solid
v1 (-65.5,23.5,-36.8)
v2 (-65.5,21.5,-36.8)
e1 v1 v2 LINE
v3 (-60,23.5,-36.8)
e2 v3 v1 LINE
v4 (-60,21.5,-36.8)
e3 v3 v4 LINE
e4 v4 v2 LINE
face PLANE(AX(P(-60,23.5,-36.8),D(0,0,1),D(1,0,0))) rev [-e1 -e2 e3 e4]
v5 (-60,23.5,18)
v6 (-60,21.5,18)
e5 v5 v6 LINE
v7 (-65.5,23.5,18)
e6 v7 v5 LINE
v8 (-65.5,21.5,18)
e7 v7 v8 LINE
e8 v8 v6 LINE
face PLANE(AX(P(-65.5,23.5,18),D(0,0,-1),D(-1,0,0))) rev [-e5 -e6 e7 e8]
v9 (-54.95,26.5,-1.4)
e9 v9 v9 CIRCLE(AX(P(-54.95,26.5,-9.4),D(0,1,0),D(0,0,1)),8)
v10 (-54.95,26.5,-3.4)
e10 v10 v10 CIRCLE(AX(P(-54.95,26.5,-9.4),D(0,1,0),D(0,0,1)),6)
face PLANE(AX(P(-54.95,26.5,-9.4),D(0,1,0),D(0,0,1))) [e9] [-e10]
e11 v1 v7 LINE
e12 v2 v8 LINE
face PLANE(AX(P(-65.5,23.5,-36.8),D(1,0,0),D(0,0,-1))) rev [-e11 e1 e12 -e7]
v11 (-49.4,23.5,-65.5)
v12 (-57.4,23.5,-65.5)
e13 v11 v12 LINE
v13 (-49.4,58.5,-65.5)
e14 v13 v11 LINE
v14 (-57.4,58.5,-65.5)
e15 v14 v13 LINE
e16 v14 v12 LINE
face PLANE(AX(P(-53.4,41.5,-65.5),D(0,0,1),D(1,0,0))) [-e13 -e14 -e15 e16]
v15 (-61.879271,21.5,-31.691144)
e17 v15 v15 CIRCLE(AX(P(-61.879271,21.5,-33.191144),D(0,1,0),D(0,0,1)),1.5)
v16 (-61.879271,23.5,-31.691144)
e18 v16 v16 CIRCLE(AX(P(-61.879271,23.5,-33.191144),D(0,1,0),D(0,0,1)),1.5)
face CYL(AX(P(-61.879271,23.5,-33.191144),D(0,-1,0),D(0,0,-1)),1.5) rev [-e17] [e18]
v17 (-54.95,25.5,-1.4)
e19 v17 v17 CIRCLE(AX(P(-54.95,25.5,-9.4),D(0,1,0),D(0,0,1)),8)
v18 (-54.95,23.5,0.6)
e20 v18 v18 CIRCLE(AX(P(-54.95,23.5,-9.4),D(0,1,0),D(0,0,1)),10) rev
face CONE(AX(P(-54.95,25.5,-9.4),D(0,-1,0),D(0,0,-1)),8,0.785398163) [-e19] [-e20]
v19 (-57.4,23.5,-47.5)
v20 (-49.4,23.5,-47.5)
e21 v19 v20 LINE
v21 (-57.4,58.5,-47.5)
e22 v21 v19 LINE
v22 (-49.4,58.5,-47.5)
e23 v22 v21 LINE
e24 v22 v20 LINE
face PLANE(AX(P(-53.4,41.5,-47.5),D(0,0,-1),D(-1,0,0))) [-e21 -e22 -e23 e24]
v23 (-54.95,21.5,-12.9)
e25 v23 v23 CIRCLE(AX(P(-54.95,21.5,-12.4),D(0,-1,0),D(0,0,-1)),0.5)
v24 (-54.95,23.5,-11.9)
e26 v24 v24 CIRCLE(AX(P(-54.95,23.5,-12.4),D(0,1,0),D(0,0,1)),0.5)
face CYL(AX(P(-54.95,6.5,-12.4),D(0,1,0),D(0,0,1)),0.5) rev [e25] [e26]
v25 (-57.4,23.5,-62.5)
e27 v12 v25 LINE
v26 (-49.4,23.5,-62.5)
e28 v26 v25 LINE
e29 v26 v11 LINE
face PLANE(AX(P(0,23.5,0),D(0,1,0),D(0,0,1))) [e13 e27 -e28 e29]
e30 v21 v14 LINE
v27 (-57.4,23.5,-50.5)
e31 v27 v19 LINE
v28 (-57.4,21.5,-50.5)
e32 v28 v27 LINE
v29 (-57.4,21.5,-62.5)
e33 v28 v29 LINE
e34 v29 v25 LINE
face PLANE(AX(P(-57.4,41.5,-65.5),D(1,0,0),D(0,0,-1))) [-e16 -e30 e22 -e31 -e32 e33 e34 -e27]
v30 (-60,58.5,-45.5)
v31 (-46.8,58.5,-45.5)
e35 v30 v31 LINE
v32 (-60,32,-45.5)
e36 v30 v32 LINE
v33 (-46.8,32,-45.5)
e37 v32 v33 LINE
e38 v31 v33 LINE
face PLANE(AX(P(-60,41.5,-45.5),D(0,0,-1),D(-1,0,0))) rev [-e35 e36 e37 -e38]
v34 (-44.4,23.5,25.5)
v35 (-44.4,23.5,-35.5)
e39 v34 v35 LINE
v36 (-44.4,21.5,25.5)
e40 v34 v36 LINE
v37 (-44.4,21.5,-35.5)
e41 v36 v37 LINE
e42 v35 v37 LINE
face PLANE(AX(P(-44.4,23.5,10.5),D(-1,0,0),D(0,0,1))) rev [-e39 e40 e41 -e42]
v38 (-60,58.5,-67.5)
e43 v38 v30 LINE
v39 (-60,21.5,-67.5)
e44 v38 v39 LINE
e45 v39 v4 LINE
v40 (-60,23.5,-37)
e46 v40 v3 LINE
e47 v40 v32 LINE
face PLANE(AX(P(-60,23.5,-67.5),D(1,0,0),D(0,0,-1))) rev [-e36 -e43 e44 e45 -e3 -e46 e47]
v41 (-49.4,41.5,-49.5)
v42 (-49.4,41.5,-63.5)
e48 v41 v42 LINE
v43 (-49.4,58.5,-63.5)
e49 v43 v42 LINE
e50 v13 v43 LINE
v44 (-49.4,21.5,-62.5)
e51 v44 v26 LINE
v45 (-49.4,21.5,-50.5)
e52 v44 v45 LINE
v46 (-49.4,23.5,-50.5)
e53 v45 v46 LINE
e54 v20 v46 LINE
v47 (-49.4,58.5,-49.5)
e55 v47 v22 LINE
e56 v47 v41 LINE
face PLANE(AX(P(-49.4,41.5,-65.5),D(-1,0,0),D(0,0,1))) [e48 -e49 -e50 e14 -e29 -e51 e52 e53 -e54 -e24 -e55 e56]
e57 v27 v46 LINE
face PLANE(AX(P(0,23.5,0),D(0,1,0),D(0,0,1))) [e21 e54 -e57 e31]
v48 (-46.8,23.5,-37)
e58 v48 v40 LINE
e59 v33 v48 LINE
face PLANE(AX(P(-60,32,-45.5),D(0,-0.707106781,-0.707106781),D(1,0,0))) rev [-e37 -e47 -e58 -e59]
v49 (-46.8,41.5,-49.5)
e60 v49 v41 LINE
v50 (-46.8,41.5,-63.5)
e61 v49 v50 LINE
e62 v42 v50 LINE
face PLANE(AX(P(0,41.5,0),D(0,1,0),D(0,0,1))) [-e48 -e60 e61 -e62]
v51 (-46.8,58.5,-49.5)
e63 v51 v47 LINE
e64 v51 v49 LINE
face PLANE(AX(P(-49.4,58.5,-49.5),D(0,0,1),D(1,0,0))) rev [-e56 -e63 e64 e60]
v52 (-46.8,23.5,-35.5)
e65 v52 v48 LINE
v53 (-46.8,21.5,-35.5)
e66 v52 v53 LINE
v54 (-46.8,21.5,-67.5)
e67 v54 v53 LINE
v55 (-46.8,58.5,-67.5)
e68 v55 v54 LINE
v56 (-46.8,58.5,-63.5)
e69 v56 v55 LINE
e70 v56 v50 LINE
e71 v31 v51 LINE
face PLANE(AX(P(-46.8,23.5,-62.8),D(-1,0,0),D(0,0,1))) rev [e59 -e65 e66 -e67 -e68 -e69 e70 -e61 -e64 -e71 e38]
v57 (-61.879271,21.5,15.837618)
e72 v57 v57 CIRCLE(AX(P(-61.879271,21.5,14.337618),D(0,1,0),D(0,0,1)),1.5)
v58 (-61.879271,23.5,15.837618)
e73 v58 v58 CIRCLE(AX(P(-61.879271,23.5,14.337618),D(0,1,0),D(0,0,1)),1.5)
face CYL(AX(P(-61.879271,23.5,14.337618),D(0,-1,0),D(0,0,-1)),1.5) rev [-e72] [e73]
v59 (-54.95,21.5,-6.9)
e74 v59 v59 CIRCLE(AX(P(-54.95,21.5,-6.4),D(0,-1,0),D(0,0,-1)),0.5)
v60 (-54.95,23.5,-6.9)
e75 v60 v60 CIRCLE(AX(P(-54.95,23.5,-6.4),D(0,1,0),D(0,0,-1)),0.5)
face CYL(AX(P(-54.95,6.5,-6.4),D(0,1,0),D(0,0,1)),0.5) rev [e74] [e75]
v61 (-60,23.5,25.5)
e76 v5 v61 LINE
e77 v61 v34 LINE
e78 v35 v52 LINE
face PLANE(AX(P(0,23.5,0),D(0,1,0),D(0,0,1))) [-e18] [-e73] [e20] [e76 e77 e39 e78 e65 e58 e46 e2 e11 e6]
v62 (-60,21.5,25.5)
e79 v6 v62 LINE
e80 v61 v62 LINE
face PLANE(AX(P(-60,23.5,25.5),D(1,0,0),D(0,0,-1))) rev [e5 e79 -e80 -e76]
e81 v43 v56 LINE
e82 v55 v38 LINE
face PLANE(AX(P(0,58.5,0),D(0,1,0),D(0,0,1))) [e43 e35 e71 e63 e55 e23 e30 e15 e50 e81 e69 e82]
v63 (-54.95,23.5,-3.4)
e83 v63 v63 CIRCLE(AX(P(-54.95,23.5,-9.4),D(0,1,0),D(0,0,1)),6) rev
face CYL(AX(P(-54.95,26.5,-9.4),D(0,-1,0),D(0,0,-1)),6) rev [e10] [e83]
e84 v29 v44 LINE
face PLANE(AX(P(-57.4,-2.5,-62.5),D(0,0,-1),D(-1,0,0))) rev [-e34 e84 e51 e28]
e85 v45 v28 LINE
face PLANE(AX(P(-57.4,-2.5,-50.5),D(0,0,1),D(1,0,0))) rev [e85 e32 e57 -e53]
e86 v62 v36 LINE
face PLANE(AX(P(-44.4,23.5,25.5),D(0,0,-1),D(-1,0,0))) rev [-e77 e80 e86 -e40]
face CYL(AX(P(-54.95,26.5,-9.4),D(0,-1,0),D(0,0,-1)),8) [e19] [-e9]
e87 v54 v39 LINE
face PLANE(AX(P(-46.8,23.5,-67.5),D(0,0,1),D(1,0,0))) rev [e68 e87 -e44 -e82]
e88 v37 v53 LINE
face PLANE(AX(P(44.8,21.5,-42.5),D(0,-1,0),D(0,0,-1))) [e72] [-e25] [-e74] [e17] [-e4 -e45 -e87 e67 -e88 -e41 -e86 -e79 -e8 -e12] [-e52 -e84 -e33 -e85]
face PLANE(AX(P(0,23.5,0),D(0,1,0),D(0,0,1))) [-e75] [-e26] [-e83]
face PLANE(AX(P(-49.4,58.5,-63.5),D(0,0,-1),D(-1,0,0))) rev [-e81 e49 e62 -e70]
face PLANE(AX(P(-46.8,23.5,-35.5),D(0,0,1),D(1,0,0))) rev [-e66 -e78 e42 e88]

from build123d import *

# Parameters (mm, degrees)
BOSS_EXTRUDE1_DEPTH  = 1.5
SKETCH2_W            = 4.8
SKETCH2_H            = 18
BOSS_EXTRUDE2_DEPTH  = 20
SKETCH3_R            = 1.5
CUT_EXTRUDE1_DEPTH   = 20
SKETCH4_R            = 3
SKETCH4_R_2          = 1.5
SKETCH4_W            = 4.828517764
SKETCH4_H            = 3.2
SKETCH4_W_2          = 5.829541735
SKETCH4_H_2          = 5.702554953
SKETCH4_W_3          = 4.58984945
BOSS_EXTRUDE3_DEPTH  = 3.8
SKETCH5_W            = 7.960049614
SKETCH5_H            = 4.589179968
SKETCH5_R            = 1.5
SKETCH5_W_2          = 8.506770289
SKETCH5_H_2          = 5.091999219
SKETCH5_W_3          = 7.172313144
SKETCH5_H_3          = 12.5
SKETCH5_H_4          = 13
BOSS_EXTRUDE4_DEPTH  = 4.25
SKETCH6_W            = 6.917388718
SKETCH6_H            = 7.693263261
SKETCH6_R            = 1.5
SKETCH6_W_2          = 6.017640473
SKETCH6_H_2          = 7.169329529
BOSS_EXTRUDE5_DEPTH  = 12.5
SKETCH7_R            = 1.5
BOSS_EXTRUDE7_DEPTH  = 2
INTERSECT1_DEPTH     = 21.5
SKETCH8_W            = 13.2
SKETCH8_H            = 22
BOSS_EXTRUDE8_DEPTH  = 18
SKETCH9_W            = 8
SKETCH9_H            = 12
CUT_EXTRUDE2_DEPTH   = 26
BOSS_EXTRUDE9_DEPTH  = 17
CHAMFER1_SIZE        = 8.5
SKETCH11_R           = 0.5
CUT_EXTRUDE3_DEPTH   = 17
SKETCH12_R           = 8
SKETCH12_R_2         = 6
BOSS_EXTRUDE10_DEPTH = 3
CHAMFER2_SIZE        = 2


# Read off the part's stored shape, not the designer's step: Intersect1
with BuildPart() as part:
    # Sketch1 → Boss-Extrude1 (new body)
    with BuildSketch(Plane(origin=(0, 0, 0), x_dir=(1, 0, 0), z_dir=(0, 1, 0))):
        Polygon((-60, -67.5), (-60, -72.5), (-52, -72.5), (-52, -67.5), (52, -67.5), (52, -72.5), (60, -72.5), (60, -67.5), (60, 67.5), (-60, 67.5), (-60, 36.8), (-65.5, 36.8), (-65.5, 29.3), (-60, 29.3), (-60, 16.8), (-65.5, 16.8), (-65.5, 7.8), (-65.5, -1.2), (-60, -1.2), (-60, -10.5), (-65.5, -10.5), (-65.5, -18), (-60, -18), align=None)
    extrude(amount=BOSS_EXTRUDE1_DEPTH)

    # Sketch2 → Boss-Extrude2 (add)
    with BuildSketch(Plane(origin=(0, 1.5, 0), x_dir=(1, 0, 0), z_dir=(0, 1, 0))):
        Polygon((-58, 62.8), (-58, 29.3), (-60, 29.3), (-65.5, 29.3), (-65.5, 36.8), (-60, 36.8), (-60, 67.5), (-55.3, 67.5), (-55.3, 65.5), align=None)
        with BuildLine():
            Line((-58, -65.5), (58, -65.5))
            Line((58, -65.5), (58, -25.5))
            Line((58, -25.5), (29.8, -25.5))
            Line((29.8, -25.5), (29.8, -18))
            Line((29.8, -18), (58, -18))
            Line((58, -18), (58, 38.5))
            ThreePointArc((58, 38.5), (57.414213562, 39.914213562), (56, 40.5))
            Line((56, 40.5), (51.8, 40.5))
            ThreePointArc((51.8, 40.5), (50.385786438, 41.085786438), (49.8, 42.5))
            Line((49.8, 42.5), (49.8, 48.75))
            Line((49.8, 48.75), (51.3, 48.75))
            Line((51.3, 48.75), (51.3, 47.25))
            Line((51.3, 47.25), (58, 47.25))
            Line((58, 47.25), (58, 51.25))
            Line((58, 51.25), (60, 51.25))
            Line((60, 51.25), (60, -72.5))
            Line((60, -72.5), (52, -72.5))
            Line((52, -72.5), (52, -67.5))
            Line((52, -67.5), (-52, -67.5))
            Line((-52, -67.5), (-52, -72.5))
            Line((-52, -72.5), (-60, -72.5))
            Line((-60, -72.5), (-60, -52.5))
            Line((-60, -52.5), (-58, -52.5))
            Line((-58, -52.5), (-58, -65.5))
        make_face()
        Polygon((-60, 16.8), (-58, 16.8), (-58, -1.2), (-60, -1.2), (-65.5, -1.2), (-65.5, 16.8), align=None)
        Polygon((-60, -10.5), (-58, -10.5), (-58, -38), (-60, -38), (-60, -18), (-65.5, -18), (-65.5, -10.5), align=None)
        with BuildLine():
            Line((-48.8, 67.5), (-48.8, 65.5))
            Line((-48.8, 65.5), (-46.8, 62.8))
            Line((-46.8, 62.8), (-46.8, 58.5))
            Line((-46.8, 58.5), (-44.8, 58.5))
            Line((-44.8, 58.5), (-37.8, 64.5))
            Line((-37.8, 64.5), (38.8, 64.5))
            Line((38.8, 64.5), (44.8, 58.5))
            Line((44.8, 58.5), (44.8, 46.5))
            Line((44.8, 46.5), (41.3, 46.5))
            Line((41.3, 46.5), (41.3, 42.5))
            Line((41.3, 42.5), (38.85, 42.5))
            Line((38.85, 42.5), (38.85, 40.5))
            Line((38.85, 40.5), (44.8, 40.5))
            ThreePointArc((44.8, 40.5), (46.214213562, 41.085786438), (46.8, 42.5))
            Line((46.8, 42.5), (46.8, 46.5))
            Line((46.8, 46.5), (46.8, 57.25))
            Line((46.8, 57.25), (51.3, 57.25))
            Line((51.3, 57.25), (51.3, 58.75))
            Line((51.3, 58.75), (58, 58.75))
            Line((58, 58.75), (58, 54.75))
            Line((58, 54.75), (60, 54.75))
            Line((60, 54.75), (60, 67.5))
            Line((60, 67.5), (-48.8, 67.5))
        make_face()
        Polygon((-46.8, 46.5), (-39.5, 46.5), (-39.5, 42.5), (-37.05, 42.5), (-37.05, 40.5), (-46.8, 40.5), align=None)
        Polygon((-33.55, 42.5), (-33.55, 40.5), (-18.65, 40.5), (-18.65, 42.5), (-21.1, 42.5), (-21.1, 46.5), (-31.1, 46.5), (-31.1, 42.5), align=None)
        Polygon((-15.55, 40.5), (-0.65, 40.5), (-0.65, 42.5), (-3.1, 42.5), (-3.1, 46.5), (-13.1, 46.5), (-13.1, 42.5), (-15.55, 42.5), align=None)
        Polygon((2.45, 40.5), (17.35, 40.5), (17.35, 42.5), (14.9, 42.5), (14.9, 46.5), (4.9, 46.5), (4.9, 42.5), (2.45, 42.5), align=None)
        Polygon((20.45, 40.5), (35.35, 40.5), (35.35, 42.5), (32.9, 42.5), (32.9, 46.5), (22.9, 46.5), (22.9, 42.5), (20.45, 42.5), align=None)
        Polygon((-46.8, 35.5), (-49.2, 35.5), (-49.2, 29.3), (-44.4, 29.3), (-44.4, 35.5), align=None)
        with Locations((-46.8, 7.8)):
            Rectangle(SKETCH2_W, SKETCH2_H)
        Polygon((-49.2, -10.5), (-44.4, -10.5), (-44.4, -18), (-16.9, -18), (-16.9, -25.5), (-46.4, -25.5), (-46.4, -19.9), (-49.2, -14), align=None)
    extrude(amount=BOSS_EXTRUDE2_DEPTH)

    # Sketch3 → Cut-Extrude1 (cut)
    with BuildSketch(Plane(origin=(0, 21.5, 0), x_dir=(1, 0, 0), z_dir=(0, 1, 0))):
        with Locations(Location((52.774715074, 63.354517547, 0), (0, 0, 270))):
            Circle(SKETCH3_R)
        with Locations(Location((-43.84271688, 64.854517547, 0), (0, 0, 270))):
            Circle(SKETCH3_R)
        with Locations(Location((-61.879270776, 33.191143968, 0), (0, 0, 270))):
            Circle(SKETCH3_R)
        with Locations(Location((-61.879270776, -14.337618299, 0), (0, 0, 270))):
            Circle(SKETCH3_R)
        with Locations(Location((54.274715074, 43.945098524, 0), (0, 0, 270))):
            Circle(SKETCH3_R)
        with Locations(Location((-21.029637868, -21.862387391, 0), (0, 0, 270))):
            Circle(SKETCH3_R)
        with Locations(Location((34.3, -21.75, 0), (0, 0, 270))):
            Circle(SKETCH3_R)
        with Locations(Location((-56, -69, 0), (0, 0, 270))):
            Circle(SKETCH3_R)
        with Locations(Location((56, -69, 0), (0, 0, 270))):
            Circle(SKETCH3_R)
    extrude(amount=-CUT_EXTRUDE1_DEPTH, mode=Mode.SUBTRACT)

    # Sketch4 → Boss-Extrude3 (add)
    # profile 1 of 5: a face of its own
    with BuildSketch(Plane(origin=(0, 1.5, 0), x_dir=(1, 0, 0), z_dir=(0, 1, 0))):
        with Locations(Location((21.544764921, -8.320497528, 0), (0, 0, 90))):
            Circle(SKETCH4_R)
        with Locations(Location((21.544764921, -8.320497528, 0), (0, 0, 90))):
            Circle(SKETCH4_R_2, mode=Mode.SUBTRACT)
    # profile 2 of 5: a face of its own
    with BuildSketch(Plane(origin=(0, 1.5, 0), x_dir=(1, 0, 0), z_dir=(0, 1, 0))):
        with Locations(Location((21.544764921, 19.479502472, 0), (0, 0, 90))):
            Circle(SKETCH4_R)
        with Locations(Location((21.544764921, 19.479502472, 0), (0, 0, 90))):
            Circle(SKETCH4_R_2, mode=Mode.SUBTRACT)
    # profile 3 of 5: a face of its own
    with BuildSketch(Plane(origin=(0, 1.5, 0), x_dir=(1, 0, 0), z_dir=(0, 1, 0))):
        with Locations((-29.2, 33.9)):
            Rectangle(SKETCH4_W, SKETCH4_H)
        with Locations(Location((-29.2, 33.9, 0), (0, 0, 90))):
            Circle(SKETCH4_R_2, mode=Mode.SUBTRACT)
    # profile 4 of 5: a face of its own
    with BuildSketch(Plane(origin=(0, 1.5, 0), x_dir=(1, 0, 0), z_dir=(0, 1, 0))):
        with Locations((-30.25253813, -15.148722524)):
            Rectangle(SKETCH4_W_2, SKETCH4_H_2)
        with Locations(Location((-30.3, -14.4, 0), (0, 0, 90))):
            Circle(SKETCH4_R_2, mode=Mode.SUBTRACT)
    # profile 5 of 5: a face of its own
    with BuildSketch(Plane(origin=(0, 1.5, 0), x_dir=(1, 0, 0), z_dir=(0, 1, 0))):
        with Locations((51.718864017, -15.148722524)):
            Rectangle(SKETCH4_W_3, SKETCH4_H_2)
        with Locations(Location((51.8, -14.4, 0), (0, 0, 90))):
            Circle(SKETCH4_R_2, mode=Mode.SUBTRACT)
    extrude(amount=BOSS_EXTRUDE3_DEPTH)

    # Sketch5 → Boss-Extrude4 (add)
    # profile 1 of 4: a face of its own
    with BuildSketch(Plane(origin=(0, 1.5, 0), x_dir=(1, 0, 0), z_dir=(0, 1, 0))):
        with Locations((-54.019975193, -35.705410016)):
            Rectangle(SKETCH5_W, SKETCH5_H)
        with Locations(Location((-52.773553759, -35.8, 0), (0, 0, 270))):
            Circle(SKETCH5_R, mode=Mode.SUBTRACT)
    # profile 2 of 4: a face of its own
    with BuildSketch(Plane(origin=(0, 1.5, 0), x_dir=(1, 0, 0), z_dir=(0, 1, 0))):
        with Locations((-53.746614856, -55.04599961)):
            Rectangle(SKETCH5_W_2, SKETCH5_H_2)
        with Locations(Location((-52.773553759, -54.7, 0), (0, 0, 270))):
            Circle(SKETCH5_R, mode=Mode.SUBTRACT)
    # profile 3 of 4: a face of its own
    with BuildSketch(Plane(origin=(0, 1.5, 0), x_dir=(1, 0, 0), z_dir=(0, 1, 0))):
        with Locations((-27.40354529, -31.75)):
            Rectangle(SKETCH5_W_3, SKETCH5_H_3)
        with Locations(Location((-27.173553759, -35.8, 0), (0, 0, 270))):
            Circle(SKETCH5_R, mode=Mode.SUBTRACT)
    # profile 4 of 4: a face of its own
    with BuildSketch(Plane(origin=(0, 1.5, 0), x_dir=(1, 0, 0), z_dir=(0, 1, 0))):
        with Locations((-27.40354529, -59)):
            Rectangle(SKETCH5_W_3, SKETCH5_H_4)
        with Locations(Location((-27.173553759, -54.7, 0), (0, 0, 270))):
            Circle(SKETCH5_R, mode=Mode.SUBTRACT)
    extrude(amount=BOSS_EXTRUDE4_DEPTH)

    # Sketch6 → Boss-Extrude5 (add)
    # profile 1 of 4: a face of its own
    with BuildSketch(Plane(origin=(0, 1.5, 0), x_dir=(1, 0, 0), z_dir=(0, 1, 0))):
        with Locations((-20.358694359, -29.346631631)):
            Rectangle(SKETCH6_W, SKETCH6_H)
        with Locations(Location((-19.26, -30.5, 0), (0, 0, 270))):
            Circle(SKETCH6_R, mode=Mode.SUBTRACT)
    # profile 2 of 4: a face of its own
    with BuildSketch(Plane(origin=(0, 1.5, 0), x_dir=(1, 0, 0), z_dir=(0, 1, 0))):
        with Locations((54.991179763, -29.346631631)):
            Rectangle(SKETCH6_W_2, SKETCH6_H)
        with Locations(Location((55.14, -30.5, 0), (0, 0, 270))):
            Circle(SKETCH6_R, mode=Mode.SUBTRACT)
    # profile 3 of 4: a face of its own
    with BuildSketch(Plane(origin=(0, 1.5, 0), x_dir=(1, 0, 0), z_dir=(0, 1, 0))):
        with Locations((54.991179763, -61.915335236)):
            Rectangle(SKETCH6_W_2, SKETCH6_H_2)
        with Locations(Location((55.14, -61.1, 0), (0, 0, 270))):
            Circle(SKETCH6_R, mode=Mode.SUBTRACT)
    # profile 4 of 4: a face of its own
    with BuildSketch(Plane(origin=(0, 1.5, 0), x_dir=(1, 0, 0), z_dir=(0, 1, 0))):
        with Locations((-20.358694359, -61.915335236)):
            Rectangle(SKETCH6_W, SKETCH6_H_2)
        with Locations(Location((-19.26, -61.1, 0), (0, 0, 270))):
            Circle(SKETCH6_R, mode=Mode.SUBTRACT)
    extrude(amount=BOSS_EXTRUDE5_DEPTH)

    # Intersect1 outline → Intersect1 (cut)
    with BuildSketch(Plane(origin=(0, 0, 0), x_dir=(1, 0, 0), z_dir=(0, 1, 0))):
        Polygon((-60, -72.5), (-52, -72.5), (-52, -67.5), (52, -67.5), (52, -72.5), (60, -72.5), (60, 67.5), (-60, 67.5), (-60, 36.8), (-65.5, 36.8), (-65.5, 29.3), (-60, 29.3), (-60, 16.8), (-65.5, 16.8), (-65.5, -1.2), (-60, -1.2), (-60, -10.5), (-65.5, -10.5), (-65.5, -18), (-60, -18), align=None)
    extrude(amount=INTERSECT1_DEPTH, mode=Mode.SUBTRACT)


with BuildPart() as body_2:
    # Sketch7 → Boss-Extrude7 (new body)
    with BuildSketch(Plane(origin=(0, 21.5, 0), x_dir=(1, 0, 0), z_dir=(0, 1, 0))):
        Polygon((-60, 67.5), (-60, 36.8), (-65.5, 36.8), (-65.5, -18), (-60, -18), (-60, -25.5), (-46.4, -25.5), (-44.4, -25.5), (-44.4, -10.5), (-44.4, 35.5), (-46.8, 35.5), (-46.8, 62.8), (-46.8, 67.5), align=None)
        with Locations(Location((-61.879270776, -14.337618299, 0), (0, 0, 270))):
            Circle(SKETCH7_R, mode=Mode.SUBTRACT)
        with Locations(Location((-61.879270776, 33.191143968, 0), (0, 0, 270))):
            Circle(SKETCH7_R, mode=Mode.SUBTRACT)
    extrude(amount=BOSS_EXTRUDE7_DEPTH)

    # Sketch8 → Boss-Extrude8 (add)
    with BuildSketch(Plane(origin=(0, 23.5, 0), x_dir=(1, 0, 0), z_dir=(0, 1, 0))):
        with Locations((-53.4, 56.5)):
            Rectangle(SKETCH8_W, SKETCH8_H)
        Polygon((-53.4, 65.5), (-57.4, 65.5), (-57.4, 47.5), (-53.4, 47.5), (-49.4, 47.5), (-49.4, 65.5), align=None, mode=Mode.SUBTRACT)
    extrude(amount=BOSS_EXTRUDE8_DEPTH)

    # Sketch9 → Cut-Extrude2 (cut)
    with BuildSketch(Plane(origin=(0, 23.5, 0), x_dir=(1, 0, 0), z_dir=(0, 1, 0))):
        with Locations((-53.4, 56.5)):
            Rectangle(SKETCH9_W, SKETCH9_H)
    extrude(amount=-CUT_EXTRUDE2_DEPTH, mode=Mode.SUBTRACT)

    # Sketch10 → Boss-Extrude9 (add)
    with BuildSketch(Plane(origin=(0, 41.5, 0), x_dir=(1, 0, 0), z_dir=(0, 1, 0))):
        Polygon((-49.4, 63.5), (-46.8, 63.5), (-46.8, 67.5), (-60, 67.5), (-60, 45.5), (-46.8, 45.5), (-46.8, 49.5), (-49.4, 49.5), (-49.4, 47.5), (-57.4, 47.5), (-57.4, 65.5), (-49.4, 65.5), align=None)
    extrude(amount=BOSS_EXTRUDE9_DEPTH)

    # Chamfer1
    chamfer1_edges = [body_2.edges().sort_by_distance(p)[0] for p in [
        (-53.4, 23.5, -45.5),
    ]]
    chamfer(chamfer1_edges, length=CHAMFER1_SIZE)

    # Sketch11 → Cut-Extrude3 (cut)
    with BuildSketch(Plane(origin=(0, 23.5, 0), x_dir=(1, 0, 0), z_dir=(0, 1, 0))):
        with Locations(Location((-54.95, 12.4, 0), (0, 0, 270))):
            Circle(SKETCH11_R)
        with Locations(Location((-54.95, 6.4, 0), (0, 0, 90))):
            Circle(SKETCH11_R)
    extrude(amount=-CUT_EXTRUDE3_DEPTH, mode=Mode.SUBTRACT)

    # Sketch12 → Boss-Extrude10 (add)
    with BuildSketch(Plane(origin=(0, 23.5, 0), x_dir=(1, 0, 0), z_dir=(0, 1, 0))):
        with Locations(Location((-54.95, 9.4, 0), (0, 0, 270))):
            Circle(SKETCH12_R)
        with Locations(Location((-54.95, 9.4, 0), (0, 0, 270))):
            Circle(SKETCH12_R_2, mode=Mode.SUBTRACT)
    extrude(amount=BOSS_EXTRUDE10_DEPTH)

    # Chamfer2
    chamfer2_edges = [body_2.edges().sort_by_distance(p)[0] for p in [
        (-54.95, 23.5, -17.4),
    ]]
    chamfer(chamfer2_edges, length=CHAMFER2_SIZE)


solid = body_2.part
